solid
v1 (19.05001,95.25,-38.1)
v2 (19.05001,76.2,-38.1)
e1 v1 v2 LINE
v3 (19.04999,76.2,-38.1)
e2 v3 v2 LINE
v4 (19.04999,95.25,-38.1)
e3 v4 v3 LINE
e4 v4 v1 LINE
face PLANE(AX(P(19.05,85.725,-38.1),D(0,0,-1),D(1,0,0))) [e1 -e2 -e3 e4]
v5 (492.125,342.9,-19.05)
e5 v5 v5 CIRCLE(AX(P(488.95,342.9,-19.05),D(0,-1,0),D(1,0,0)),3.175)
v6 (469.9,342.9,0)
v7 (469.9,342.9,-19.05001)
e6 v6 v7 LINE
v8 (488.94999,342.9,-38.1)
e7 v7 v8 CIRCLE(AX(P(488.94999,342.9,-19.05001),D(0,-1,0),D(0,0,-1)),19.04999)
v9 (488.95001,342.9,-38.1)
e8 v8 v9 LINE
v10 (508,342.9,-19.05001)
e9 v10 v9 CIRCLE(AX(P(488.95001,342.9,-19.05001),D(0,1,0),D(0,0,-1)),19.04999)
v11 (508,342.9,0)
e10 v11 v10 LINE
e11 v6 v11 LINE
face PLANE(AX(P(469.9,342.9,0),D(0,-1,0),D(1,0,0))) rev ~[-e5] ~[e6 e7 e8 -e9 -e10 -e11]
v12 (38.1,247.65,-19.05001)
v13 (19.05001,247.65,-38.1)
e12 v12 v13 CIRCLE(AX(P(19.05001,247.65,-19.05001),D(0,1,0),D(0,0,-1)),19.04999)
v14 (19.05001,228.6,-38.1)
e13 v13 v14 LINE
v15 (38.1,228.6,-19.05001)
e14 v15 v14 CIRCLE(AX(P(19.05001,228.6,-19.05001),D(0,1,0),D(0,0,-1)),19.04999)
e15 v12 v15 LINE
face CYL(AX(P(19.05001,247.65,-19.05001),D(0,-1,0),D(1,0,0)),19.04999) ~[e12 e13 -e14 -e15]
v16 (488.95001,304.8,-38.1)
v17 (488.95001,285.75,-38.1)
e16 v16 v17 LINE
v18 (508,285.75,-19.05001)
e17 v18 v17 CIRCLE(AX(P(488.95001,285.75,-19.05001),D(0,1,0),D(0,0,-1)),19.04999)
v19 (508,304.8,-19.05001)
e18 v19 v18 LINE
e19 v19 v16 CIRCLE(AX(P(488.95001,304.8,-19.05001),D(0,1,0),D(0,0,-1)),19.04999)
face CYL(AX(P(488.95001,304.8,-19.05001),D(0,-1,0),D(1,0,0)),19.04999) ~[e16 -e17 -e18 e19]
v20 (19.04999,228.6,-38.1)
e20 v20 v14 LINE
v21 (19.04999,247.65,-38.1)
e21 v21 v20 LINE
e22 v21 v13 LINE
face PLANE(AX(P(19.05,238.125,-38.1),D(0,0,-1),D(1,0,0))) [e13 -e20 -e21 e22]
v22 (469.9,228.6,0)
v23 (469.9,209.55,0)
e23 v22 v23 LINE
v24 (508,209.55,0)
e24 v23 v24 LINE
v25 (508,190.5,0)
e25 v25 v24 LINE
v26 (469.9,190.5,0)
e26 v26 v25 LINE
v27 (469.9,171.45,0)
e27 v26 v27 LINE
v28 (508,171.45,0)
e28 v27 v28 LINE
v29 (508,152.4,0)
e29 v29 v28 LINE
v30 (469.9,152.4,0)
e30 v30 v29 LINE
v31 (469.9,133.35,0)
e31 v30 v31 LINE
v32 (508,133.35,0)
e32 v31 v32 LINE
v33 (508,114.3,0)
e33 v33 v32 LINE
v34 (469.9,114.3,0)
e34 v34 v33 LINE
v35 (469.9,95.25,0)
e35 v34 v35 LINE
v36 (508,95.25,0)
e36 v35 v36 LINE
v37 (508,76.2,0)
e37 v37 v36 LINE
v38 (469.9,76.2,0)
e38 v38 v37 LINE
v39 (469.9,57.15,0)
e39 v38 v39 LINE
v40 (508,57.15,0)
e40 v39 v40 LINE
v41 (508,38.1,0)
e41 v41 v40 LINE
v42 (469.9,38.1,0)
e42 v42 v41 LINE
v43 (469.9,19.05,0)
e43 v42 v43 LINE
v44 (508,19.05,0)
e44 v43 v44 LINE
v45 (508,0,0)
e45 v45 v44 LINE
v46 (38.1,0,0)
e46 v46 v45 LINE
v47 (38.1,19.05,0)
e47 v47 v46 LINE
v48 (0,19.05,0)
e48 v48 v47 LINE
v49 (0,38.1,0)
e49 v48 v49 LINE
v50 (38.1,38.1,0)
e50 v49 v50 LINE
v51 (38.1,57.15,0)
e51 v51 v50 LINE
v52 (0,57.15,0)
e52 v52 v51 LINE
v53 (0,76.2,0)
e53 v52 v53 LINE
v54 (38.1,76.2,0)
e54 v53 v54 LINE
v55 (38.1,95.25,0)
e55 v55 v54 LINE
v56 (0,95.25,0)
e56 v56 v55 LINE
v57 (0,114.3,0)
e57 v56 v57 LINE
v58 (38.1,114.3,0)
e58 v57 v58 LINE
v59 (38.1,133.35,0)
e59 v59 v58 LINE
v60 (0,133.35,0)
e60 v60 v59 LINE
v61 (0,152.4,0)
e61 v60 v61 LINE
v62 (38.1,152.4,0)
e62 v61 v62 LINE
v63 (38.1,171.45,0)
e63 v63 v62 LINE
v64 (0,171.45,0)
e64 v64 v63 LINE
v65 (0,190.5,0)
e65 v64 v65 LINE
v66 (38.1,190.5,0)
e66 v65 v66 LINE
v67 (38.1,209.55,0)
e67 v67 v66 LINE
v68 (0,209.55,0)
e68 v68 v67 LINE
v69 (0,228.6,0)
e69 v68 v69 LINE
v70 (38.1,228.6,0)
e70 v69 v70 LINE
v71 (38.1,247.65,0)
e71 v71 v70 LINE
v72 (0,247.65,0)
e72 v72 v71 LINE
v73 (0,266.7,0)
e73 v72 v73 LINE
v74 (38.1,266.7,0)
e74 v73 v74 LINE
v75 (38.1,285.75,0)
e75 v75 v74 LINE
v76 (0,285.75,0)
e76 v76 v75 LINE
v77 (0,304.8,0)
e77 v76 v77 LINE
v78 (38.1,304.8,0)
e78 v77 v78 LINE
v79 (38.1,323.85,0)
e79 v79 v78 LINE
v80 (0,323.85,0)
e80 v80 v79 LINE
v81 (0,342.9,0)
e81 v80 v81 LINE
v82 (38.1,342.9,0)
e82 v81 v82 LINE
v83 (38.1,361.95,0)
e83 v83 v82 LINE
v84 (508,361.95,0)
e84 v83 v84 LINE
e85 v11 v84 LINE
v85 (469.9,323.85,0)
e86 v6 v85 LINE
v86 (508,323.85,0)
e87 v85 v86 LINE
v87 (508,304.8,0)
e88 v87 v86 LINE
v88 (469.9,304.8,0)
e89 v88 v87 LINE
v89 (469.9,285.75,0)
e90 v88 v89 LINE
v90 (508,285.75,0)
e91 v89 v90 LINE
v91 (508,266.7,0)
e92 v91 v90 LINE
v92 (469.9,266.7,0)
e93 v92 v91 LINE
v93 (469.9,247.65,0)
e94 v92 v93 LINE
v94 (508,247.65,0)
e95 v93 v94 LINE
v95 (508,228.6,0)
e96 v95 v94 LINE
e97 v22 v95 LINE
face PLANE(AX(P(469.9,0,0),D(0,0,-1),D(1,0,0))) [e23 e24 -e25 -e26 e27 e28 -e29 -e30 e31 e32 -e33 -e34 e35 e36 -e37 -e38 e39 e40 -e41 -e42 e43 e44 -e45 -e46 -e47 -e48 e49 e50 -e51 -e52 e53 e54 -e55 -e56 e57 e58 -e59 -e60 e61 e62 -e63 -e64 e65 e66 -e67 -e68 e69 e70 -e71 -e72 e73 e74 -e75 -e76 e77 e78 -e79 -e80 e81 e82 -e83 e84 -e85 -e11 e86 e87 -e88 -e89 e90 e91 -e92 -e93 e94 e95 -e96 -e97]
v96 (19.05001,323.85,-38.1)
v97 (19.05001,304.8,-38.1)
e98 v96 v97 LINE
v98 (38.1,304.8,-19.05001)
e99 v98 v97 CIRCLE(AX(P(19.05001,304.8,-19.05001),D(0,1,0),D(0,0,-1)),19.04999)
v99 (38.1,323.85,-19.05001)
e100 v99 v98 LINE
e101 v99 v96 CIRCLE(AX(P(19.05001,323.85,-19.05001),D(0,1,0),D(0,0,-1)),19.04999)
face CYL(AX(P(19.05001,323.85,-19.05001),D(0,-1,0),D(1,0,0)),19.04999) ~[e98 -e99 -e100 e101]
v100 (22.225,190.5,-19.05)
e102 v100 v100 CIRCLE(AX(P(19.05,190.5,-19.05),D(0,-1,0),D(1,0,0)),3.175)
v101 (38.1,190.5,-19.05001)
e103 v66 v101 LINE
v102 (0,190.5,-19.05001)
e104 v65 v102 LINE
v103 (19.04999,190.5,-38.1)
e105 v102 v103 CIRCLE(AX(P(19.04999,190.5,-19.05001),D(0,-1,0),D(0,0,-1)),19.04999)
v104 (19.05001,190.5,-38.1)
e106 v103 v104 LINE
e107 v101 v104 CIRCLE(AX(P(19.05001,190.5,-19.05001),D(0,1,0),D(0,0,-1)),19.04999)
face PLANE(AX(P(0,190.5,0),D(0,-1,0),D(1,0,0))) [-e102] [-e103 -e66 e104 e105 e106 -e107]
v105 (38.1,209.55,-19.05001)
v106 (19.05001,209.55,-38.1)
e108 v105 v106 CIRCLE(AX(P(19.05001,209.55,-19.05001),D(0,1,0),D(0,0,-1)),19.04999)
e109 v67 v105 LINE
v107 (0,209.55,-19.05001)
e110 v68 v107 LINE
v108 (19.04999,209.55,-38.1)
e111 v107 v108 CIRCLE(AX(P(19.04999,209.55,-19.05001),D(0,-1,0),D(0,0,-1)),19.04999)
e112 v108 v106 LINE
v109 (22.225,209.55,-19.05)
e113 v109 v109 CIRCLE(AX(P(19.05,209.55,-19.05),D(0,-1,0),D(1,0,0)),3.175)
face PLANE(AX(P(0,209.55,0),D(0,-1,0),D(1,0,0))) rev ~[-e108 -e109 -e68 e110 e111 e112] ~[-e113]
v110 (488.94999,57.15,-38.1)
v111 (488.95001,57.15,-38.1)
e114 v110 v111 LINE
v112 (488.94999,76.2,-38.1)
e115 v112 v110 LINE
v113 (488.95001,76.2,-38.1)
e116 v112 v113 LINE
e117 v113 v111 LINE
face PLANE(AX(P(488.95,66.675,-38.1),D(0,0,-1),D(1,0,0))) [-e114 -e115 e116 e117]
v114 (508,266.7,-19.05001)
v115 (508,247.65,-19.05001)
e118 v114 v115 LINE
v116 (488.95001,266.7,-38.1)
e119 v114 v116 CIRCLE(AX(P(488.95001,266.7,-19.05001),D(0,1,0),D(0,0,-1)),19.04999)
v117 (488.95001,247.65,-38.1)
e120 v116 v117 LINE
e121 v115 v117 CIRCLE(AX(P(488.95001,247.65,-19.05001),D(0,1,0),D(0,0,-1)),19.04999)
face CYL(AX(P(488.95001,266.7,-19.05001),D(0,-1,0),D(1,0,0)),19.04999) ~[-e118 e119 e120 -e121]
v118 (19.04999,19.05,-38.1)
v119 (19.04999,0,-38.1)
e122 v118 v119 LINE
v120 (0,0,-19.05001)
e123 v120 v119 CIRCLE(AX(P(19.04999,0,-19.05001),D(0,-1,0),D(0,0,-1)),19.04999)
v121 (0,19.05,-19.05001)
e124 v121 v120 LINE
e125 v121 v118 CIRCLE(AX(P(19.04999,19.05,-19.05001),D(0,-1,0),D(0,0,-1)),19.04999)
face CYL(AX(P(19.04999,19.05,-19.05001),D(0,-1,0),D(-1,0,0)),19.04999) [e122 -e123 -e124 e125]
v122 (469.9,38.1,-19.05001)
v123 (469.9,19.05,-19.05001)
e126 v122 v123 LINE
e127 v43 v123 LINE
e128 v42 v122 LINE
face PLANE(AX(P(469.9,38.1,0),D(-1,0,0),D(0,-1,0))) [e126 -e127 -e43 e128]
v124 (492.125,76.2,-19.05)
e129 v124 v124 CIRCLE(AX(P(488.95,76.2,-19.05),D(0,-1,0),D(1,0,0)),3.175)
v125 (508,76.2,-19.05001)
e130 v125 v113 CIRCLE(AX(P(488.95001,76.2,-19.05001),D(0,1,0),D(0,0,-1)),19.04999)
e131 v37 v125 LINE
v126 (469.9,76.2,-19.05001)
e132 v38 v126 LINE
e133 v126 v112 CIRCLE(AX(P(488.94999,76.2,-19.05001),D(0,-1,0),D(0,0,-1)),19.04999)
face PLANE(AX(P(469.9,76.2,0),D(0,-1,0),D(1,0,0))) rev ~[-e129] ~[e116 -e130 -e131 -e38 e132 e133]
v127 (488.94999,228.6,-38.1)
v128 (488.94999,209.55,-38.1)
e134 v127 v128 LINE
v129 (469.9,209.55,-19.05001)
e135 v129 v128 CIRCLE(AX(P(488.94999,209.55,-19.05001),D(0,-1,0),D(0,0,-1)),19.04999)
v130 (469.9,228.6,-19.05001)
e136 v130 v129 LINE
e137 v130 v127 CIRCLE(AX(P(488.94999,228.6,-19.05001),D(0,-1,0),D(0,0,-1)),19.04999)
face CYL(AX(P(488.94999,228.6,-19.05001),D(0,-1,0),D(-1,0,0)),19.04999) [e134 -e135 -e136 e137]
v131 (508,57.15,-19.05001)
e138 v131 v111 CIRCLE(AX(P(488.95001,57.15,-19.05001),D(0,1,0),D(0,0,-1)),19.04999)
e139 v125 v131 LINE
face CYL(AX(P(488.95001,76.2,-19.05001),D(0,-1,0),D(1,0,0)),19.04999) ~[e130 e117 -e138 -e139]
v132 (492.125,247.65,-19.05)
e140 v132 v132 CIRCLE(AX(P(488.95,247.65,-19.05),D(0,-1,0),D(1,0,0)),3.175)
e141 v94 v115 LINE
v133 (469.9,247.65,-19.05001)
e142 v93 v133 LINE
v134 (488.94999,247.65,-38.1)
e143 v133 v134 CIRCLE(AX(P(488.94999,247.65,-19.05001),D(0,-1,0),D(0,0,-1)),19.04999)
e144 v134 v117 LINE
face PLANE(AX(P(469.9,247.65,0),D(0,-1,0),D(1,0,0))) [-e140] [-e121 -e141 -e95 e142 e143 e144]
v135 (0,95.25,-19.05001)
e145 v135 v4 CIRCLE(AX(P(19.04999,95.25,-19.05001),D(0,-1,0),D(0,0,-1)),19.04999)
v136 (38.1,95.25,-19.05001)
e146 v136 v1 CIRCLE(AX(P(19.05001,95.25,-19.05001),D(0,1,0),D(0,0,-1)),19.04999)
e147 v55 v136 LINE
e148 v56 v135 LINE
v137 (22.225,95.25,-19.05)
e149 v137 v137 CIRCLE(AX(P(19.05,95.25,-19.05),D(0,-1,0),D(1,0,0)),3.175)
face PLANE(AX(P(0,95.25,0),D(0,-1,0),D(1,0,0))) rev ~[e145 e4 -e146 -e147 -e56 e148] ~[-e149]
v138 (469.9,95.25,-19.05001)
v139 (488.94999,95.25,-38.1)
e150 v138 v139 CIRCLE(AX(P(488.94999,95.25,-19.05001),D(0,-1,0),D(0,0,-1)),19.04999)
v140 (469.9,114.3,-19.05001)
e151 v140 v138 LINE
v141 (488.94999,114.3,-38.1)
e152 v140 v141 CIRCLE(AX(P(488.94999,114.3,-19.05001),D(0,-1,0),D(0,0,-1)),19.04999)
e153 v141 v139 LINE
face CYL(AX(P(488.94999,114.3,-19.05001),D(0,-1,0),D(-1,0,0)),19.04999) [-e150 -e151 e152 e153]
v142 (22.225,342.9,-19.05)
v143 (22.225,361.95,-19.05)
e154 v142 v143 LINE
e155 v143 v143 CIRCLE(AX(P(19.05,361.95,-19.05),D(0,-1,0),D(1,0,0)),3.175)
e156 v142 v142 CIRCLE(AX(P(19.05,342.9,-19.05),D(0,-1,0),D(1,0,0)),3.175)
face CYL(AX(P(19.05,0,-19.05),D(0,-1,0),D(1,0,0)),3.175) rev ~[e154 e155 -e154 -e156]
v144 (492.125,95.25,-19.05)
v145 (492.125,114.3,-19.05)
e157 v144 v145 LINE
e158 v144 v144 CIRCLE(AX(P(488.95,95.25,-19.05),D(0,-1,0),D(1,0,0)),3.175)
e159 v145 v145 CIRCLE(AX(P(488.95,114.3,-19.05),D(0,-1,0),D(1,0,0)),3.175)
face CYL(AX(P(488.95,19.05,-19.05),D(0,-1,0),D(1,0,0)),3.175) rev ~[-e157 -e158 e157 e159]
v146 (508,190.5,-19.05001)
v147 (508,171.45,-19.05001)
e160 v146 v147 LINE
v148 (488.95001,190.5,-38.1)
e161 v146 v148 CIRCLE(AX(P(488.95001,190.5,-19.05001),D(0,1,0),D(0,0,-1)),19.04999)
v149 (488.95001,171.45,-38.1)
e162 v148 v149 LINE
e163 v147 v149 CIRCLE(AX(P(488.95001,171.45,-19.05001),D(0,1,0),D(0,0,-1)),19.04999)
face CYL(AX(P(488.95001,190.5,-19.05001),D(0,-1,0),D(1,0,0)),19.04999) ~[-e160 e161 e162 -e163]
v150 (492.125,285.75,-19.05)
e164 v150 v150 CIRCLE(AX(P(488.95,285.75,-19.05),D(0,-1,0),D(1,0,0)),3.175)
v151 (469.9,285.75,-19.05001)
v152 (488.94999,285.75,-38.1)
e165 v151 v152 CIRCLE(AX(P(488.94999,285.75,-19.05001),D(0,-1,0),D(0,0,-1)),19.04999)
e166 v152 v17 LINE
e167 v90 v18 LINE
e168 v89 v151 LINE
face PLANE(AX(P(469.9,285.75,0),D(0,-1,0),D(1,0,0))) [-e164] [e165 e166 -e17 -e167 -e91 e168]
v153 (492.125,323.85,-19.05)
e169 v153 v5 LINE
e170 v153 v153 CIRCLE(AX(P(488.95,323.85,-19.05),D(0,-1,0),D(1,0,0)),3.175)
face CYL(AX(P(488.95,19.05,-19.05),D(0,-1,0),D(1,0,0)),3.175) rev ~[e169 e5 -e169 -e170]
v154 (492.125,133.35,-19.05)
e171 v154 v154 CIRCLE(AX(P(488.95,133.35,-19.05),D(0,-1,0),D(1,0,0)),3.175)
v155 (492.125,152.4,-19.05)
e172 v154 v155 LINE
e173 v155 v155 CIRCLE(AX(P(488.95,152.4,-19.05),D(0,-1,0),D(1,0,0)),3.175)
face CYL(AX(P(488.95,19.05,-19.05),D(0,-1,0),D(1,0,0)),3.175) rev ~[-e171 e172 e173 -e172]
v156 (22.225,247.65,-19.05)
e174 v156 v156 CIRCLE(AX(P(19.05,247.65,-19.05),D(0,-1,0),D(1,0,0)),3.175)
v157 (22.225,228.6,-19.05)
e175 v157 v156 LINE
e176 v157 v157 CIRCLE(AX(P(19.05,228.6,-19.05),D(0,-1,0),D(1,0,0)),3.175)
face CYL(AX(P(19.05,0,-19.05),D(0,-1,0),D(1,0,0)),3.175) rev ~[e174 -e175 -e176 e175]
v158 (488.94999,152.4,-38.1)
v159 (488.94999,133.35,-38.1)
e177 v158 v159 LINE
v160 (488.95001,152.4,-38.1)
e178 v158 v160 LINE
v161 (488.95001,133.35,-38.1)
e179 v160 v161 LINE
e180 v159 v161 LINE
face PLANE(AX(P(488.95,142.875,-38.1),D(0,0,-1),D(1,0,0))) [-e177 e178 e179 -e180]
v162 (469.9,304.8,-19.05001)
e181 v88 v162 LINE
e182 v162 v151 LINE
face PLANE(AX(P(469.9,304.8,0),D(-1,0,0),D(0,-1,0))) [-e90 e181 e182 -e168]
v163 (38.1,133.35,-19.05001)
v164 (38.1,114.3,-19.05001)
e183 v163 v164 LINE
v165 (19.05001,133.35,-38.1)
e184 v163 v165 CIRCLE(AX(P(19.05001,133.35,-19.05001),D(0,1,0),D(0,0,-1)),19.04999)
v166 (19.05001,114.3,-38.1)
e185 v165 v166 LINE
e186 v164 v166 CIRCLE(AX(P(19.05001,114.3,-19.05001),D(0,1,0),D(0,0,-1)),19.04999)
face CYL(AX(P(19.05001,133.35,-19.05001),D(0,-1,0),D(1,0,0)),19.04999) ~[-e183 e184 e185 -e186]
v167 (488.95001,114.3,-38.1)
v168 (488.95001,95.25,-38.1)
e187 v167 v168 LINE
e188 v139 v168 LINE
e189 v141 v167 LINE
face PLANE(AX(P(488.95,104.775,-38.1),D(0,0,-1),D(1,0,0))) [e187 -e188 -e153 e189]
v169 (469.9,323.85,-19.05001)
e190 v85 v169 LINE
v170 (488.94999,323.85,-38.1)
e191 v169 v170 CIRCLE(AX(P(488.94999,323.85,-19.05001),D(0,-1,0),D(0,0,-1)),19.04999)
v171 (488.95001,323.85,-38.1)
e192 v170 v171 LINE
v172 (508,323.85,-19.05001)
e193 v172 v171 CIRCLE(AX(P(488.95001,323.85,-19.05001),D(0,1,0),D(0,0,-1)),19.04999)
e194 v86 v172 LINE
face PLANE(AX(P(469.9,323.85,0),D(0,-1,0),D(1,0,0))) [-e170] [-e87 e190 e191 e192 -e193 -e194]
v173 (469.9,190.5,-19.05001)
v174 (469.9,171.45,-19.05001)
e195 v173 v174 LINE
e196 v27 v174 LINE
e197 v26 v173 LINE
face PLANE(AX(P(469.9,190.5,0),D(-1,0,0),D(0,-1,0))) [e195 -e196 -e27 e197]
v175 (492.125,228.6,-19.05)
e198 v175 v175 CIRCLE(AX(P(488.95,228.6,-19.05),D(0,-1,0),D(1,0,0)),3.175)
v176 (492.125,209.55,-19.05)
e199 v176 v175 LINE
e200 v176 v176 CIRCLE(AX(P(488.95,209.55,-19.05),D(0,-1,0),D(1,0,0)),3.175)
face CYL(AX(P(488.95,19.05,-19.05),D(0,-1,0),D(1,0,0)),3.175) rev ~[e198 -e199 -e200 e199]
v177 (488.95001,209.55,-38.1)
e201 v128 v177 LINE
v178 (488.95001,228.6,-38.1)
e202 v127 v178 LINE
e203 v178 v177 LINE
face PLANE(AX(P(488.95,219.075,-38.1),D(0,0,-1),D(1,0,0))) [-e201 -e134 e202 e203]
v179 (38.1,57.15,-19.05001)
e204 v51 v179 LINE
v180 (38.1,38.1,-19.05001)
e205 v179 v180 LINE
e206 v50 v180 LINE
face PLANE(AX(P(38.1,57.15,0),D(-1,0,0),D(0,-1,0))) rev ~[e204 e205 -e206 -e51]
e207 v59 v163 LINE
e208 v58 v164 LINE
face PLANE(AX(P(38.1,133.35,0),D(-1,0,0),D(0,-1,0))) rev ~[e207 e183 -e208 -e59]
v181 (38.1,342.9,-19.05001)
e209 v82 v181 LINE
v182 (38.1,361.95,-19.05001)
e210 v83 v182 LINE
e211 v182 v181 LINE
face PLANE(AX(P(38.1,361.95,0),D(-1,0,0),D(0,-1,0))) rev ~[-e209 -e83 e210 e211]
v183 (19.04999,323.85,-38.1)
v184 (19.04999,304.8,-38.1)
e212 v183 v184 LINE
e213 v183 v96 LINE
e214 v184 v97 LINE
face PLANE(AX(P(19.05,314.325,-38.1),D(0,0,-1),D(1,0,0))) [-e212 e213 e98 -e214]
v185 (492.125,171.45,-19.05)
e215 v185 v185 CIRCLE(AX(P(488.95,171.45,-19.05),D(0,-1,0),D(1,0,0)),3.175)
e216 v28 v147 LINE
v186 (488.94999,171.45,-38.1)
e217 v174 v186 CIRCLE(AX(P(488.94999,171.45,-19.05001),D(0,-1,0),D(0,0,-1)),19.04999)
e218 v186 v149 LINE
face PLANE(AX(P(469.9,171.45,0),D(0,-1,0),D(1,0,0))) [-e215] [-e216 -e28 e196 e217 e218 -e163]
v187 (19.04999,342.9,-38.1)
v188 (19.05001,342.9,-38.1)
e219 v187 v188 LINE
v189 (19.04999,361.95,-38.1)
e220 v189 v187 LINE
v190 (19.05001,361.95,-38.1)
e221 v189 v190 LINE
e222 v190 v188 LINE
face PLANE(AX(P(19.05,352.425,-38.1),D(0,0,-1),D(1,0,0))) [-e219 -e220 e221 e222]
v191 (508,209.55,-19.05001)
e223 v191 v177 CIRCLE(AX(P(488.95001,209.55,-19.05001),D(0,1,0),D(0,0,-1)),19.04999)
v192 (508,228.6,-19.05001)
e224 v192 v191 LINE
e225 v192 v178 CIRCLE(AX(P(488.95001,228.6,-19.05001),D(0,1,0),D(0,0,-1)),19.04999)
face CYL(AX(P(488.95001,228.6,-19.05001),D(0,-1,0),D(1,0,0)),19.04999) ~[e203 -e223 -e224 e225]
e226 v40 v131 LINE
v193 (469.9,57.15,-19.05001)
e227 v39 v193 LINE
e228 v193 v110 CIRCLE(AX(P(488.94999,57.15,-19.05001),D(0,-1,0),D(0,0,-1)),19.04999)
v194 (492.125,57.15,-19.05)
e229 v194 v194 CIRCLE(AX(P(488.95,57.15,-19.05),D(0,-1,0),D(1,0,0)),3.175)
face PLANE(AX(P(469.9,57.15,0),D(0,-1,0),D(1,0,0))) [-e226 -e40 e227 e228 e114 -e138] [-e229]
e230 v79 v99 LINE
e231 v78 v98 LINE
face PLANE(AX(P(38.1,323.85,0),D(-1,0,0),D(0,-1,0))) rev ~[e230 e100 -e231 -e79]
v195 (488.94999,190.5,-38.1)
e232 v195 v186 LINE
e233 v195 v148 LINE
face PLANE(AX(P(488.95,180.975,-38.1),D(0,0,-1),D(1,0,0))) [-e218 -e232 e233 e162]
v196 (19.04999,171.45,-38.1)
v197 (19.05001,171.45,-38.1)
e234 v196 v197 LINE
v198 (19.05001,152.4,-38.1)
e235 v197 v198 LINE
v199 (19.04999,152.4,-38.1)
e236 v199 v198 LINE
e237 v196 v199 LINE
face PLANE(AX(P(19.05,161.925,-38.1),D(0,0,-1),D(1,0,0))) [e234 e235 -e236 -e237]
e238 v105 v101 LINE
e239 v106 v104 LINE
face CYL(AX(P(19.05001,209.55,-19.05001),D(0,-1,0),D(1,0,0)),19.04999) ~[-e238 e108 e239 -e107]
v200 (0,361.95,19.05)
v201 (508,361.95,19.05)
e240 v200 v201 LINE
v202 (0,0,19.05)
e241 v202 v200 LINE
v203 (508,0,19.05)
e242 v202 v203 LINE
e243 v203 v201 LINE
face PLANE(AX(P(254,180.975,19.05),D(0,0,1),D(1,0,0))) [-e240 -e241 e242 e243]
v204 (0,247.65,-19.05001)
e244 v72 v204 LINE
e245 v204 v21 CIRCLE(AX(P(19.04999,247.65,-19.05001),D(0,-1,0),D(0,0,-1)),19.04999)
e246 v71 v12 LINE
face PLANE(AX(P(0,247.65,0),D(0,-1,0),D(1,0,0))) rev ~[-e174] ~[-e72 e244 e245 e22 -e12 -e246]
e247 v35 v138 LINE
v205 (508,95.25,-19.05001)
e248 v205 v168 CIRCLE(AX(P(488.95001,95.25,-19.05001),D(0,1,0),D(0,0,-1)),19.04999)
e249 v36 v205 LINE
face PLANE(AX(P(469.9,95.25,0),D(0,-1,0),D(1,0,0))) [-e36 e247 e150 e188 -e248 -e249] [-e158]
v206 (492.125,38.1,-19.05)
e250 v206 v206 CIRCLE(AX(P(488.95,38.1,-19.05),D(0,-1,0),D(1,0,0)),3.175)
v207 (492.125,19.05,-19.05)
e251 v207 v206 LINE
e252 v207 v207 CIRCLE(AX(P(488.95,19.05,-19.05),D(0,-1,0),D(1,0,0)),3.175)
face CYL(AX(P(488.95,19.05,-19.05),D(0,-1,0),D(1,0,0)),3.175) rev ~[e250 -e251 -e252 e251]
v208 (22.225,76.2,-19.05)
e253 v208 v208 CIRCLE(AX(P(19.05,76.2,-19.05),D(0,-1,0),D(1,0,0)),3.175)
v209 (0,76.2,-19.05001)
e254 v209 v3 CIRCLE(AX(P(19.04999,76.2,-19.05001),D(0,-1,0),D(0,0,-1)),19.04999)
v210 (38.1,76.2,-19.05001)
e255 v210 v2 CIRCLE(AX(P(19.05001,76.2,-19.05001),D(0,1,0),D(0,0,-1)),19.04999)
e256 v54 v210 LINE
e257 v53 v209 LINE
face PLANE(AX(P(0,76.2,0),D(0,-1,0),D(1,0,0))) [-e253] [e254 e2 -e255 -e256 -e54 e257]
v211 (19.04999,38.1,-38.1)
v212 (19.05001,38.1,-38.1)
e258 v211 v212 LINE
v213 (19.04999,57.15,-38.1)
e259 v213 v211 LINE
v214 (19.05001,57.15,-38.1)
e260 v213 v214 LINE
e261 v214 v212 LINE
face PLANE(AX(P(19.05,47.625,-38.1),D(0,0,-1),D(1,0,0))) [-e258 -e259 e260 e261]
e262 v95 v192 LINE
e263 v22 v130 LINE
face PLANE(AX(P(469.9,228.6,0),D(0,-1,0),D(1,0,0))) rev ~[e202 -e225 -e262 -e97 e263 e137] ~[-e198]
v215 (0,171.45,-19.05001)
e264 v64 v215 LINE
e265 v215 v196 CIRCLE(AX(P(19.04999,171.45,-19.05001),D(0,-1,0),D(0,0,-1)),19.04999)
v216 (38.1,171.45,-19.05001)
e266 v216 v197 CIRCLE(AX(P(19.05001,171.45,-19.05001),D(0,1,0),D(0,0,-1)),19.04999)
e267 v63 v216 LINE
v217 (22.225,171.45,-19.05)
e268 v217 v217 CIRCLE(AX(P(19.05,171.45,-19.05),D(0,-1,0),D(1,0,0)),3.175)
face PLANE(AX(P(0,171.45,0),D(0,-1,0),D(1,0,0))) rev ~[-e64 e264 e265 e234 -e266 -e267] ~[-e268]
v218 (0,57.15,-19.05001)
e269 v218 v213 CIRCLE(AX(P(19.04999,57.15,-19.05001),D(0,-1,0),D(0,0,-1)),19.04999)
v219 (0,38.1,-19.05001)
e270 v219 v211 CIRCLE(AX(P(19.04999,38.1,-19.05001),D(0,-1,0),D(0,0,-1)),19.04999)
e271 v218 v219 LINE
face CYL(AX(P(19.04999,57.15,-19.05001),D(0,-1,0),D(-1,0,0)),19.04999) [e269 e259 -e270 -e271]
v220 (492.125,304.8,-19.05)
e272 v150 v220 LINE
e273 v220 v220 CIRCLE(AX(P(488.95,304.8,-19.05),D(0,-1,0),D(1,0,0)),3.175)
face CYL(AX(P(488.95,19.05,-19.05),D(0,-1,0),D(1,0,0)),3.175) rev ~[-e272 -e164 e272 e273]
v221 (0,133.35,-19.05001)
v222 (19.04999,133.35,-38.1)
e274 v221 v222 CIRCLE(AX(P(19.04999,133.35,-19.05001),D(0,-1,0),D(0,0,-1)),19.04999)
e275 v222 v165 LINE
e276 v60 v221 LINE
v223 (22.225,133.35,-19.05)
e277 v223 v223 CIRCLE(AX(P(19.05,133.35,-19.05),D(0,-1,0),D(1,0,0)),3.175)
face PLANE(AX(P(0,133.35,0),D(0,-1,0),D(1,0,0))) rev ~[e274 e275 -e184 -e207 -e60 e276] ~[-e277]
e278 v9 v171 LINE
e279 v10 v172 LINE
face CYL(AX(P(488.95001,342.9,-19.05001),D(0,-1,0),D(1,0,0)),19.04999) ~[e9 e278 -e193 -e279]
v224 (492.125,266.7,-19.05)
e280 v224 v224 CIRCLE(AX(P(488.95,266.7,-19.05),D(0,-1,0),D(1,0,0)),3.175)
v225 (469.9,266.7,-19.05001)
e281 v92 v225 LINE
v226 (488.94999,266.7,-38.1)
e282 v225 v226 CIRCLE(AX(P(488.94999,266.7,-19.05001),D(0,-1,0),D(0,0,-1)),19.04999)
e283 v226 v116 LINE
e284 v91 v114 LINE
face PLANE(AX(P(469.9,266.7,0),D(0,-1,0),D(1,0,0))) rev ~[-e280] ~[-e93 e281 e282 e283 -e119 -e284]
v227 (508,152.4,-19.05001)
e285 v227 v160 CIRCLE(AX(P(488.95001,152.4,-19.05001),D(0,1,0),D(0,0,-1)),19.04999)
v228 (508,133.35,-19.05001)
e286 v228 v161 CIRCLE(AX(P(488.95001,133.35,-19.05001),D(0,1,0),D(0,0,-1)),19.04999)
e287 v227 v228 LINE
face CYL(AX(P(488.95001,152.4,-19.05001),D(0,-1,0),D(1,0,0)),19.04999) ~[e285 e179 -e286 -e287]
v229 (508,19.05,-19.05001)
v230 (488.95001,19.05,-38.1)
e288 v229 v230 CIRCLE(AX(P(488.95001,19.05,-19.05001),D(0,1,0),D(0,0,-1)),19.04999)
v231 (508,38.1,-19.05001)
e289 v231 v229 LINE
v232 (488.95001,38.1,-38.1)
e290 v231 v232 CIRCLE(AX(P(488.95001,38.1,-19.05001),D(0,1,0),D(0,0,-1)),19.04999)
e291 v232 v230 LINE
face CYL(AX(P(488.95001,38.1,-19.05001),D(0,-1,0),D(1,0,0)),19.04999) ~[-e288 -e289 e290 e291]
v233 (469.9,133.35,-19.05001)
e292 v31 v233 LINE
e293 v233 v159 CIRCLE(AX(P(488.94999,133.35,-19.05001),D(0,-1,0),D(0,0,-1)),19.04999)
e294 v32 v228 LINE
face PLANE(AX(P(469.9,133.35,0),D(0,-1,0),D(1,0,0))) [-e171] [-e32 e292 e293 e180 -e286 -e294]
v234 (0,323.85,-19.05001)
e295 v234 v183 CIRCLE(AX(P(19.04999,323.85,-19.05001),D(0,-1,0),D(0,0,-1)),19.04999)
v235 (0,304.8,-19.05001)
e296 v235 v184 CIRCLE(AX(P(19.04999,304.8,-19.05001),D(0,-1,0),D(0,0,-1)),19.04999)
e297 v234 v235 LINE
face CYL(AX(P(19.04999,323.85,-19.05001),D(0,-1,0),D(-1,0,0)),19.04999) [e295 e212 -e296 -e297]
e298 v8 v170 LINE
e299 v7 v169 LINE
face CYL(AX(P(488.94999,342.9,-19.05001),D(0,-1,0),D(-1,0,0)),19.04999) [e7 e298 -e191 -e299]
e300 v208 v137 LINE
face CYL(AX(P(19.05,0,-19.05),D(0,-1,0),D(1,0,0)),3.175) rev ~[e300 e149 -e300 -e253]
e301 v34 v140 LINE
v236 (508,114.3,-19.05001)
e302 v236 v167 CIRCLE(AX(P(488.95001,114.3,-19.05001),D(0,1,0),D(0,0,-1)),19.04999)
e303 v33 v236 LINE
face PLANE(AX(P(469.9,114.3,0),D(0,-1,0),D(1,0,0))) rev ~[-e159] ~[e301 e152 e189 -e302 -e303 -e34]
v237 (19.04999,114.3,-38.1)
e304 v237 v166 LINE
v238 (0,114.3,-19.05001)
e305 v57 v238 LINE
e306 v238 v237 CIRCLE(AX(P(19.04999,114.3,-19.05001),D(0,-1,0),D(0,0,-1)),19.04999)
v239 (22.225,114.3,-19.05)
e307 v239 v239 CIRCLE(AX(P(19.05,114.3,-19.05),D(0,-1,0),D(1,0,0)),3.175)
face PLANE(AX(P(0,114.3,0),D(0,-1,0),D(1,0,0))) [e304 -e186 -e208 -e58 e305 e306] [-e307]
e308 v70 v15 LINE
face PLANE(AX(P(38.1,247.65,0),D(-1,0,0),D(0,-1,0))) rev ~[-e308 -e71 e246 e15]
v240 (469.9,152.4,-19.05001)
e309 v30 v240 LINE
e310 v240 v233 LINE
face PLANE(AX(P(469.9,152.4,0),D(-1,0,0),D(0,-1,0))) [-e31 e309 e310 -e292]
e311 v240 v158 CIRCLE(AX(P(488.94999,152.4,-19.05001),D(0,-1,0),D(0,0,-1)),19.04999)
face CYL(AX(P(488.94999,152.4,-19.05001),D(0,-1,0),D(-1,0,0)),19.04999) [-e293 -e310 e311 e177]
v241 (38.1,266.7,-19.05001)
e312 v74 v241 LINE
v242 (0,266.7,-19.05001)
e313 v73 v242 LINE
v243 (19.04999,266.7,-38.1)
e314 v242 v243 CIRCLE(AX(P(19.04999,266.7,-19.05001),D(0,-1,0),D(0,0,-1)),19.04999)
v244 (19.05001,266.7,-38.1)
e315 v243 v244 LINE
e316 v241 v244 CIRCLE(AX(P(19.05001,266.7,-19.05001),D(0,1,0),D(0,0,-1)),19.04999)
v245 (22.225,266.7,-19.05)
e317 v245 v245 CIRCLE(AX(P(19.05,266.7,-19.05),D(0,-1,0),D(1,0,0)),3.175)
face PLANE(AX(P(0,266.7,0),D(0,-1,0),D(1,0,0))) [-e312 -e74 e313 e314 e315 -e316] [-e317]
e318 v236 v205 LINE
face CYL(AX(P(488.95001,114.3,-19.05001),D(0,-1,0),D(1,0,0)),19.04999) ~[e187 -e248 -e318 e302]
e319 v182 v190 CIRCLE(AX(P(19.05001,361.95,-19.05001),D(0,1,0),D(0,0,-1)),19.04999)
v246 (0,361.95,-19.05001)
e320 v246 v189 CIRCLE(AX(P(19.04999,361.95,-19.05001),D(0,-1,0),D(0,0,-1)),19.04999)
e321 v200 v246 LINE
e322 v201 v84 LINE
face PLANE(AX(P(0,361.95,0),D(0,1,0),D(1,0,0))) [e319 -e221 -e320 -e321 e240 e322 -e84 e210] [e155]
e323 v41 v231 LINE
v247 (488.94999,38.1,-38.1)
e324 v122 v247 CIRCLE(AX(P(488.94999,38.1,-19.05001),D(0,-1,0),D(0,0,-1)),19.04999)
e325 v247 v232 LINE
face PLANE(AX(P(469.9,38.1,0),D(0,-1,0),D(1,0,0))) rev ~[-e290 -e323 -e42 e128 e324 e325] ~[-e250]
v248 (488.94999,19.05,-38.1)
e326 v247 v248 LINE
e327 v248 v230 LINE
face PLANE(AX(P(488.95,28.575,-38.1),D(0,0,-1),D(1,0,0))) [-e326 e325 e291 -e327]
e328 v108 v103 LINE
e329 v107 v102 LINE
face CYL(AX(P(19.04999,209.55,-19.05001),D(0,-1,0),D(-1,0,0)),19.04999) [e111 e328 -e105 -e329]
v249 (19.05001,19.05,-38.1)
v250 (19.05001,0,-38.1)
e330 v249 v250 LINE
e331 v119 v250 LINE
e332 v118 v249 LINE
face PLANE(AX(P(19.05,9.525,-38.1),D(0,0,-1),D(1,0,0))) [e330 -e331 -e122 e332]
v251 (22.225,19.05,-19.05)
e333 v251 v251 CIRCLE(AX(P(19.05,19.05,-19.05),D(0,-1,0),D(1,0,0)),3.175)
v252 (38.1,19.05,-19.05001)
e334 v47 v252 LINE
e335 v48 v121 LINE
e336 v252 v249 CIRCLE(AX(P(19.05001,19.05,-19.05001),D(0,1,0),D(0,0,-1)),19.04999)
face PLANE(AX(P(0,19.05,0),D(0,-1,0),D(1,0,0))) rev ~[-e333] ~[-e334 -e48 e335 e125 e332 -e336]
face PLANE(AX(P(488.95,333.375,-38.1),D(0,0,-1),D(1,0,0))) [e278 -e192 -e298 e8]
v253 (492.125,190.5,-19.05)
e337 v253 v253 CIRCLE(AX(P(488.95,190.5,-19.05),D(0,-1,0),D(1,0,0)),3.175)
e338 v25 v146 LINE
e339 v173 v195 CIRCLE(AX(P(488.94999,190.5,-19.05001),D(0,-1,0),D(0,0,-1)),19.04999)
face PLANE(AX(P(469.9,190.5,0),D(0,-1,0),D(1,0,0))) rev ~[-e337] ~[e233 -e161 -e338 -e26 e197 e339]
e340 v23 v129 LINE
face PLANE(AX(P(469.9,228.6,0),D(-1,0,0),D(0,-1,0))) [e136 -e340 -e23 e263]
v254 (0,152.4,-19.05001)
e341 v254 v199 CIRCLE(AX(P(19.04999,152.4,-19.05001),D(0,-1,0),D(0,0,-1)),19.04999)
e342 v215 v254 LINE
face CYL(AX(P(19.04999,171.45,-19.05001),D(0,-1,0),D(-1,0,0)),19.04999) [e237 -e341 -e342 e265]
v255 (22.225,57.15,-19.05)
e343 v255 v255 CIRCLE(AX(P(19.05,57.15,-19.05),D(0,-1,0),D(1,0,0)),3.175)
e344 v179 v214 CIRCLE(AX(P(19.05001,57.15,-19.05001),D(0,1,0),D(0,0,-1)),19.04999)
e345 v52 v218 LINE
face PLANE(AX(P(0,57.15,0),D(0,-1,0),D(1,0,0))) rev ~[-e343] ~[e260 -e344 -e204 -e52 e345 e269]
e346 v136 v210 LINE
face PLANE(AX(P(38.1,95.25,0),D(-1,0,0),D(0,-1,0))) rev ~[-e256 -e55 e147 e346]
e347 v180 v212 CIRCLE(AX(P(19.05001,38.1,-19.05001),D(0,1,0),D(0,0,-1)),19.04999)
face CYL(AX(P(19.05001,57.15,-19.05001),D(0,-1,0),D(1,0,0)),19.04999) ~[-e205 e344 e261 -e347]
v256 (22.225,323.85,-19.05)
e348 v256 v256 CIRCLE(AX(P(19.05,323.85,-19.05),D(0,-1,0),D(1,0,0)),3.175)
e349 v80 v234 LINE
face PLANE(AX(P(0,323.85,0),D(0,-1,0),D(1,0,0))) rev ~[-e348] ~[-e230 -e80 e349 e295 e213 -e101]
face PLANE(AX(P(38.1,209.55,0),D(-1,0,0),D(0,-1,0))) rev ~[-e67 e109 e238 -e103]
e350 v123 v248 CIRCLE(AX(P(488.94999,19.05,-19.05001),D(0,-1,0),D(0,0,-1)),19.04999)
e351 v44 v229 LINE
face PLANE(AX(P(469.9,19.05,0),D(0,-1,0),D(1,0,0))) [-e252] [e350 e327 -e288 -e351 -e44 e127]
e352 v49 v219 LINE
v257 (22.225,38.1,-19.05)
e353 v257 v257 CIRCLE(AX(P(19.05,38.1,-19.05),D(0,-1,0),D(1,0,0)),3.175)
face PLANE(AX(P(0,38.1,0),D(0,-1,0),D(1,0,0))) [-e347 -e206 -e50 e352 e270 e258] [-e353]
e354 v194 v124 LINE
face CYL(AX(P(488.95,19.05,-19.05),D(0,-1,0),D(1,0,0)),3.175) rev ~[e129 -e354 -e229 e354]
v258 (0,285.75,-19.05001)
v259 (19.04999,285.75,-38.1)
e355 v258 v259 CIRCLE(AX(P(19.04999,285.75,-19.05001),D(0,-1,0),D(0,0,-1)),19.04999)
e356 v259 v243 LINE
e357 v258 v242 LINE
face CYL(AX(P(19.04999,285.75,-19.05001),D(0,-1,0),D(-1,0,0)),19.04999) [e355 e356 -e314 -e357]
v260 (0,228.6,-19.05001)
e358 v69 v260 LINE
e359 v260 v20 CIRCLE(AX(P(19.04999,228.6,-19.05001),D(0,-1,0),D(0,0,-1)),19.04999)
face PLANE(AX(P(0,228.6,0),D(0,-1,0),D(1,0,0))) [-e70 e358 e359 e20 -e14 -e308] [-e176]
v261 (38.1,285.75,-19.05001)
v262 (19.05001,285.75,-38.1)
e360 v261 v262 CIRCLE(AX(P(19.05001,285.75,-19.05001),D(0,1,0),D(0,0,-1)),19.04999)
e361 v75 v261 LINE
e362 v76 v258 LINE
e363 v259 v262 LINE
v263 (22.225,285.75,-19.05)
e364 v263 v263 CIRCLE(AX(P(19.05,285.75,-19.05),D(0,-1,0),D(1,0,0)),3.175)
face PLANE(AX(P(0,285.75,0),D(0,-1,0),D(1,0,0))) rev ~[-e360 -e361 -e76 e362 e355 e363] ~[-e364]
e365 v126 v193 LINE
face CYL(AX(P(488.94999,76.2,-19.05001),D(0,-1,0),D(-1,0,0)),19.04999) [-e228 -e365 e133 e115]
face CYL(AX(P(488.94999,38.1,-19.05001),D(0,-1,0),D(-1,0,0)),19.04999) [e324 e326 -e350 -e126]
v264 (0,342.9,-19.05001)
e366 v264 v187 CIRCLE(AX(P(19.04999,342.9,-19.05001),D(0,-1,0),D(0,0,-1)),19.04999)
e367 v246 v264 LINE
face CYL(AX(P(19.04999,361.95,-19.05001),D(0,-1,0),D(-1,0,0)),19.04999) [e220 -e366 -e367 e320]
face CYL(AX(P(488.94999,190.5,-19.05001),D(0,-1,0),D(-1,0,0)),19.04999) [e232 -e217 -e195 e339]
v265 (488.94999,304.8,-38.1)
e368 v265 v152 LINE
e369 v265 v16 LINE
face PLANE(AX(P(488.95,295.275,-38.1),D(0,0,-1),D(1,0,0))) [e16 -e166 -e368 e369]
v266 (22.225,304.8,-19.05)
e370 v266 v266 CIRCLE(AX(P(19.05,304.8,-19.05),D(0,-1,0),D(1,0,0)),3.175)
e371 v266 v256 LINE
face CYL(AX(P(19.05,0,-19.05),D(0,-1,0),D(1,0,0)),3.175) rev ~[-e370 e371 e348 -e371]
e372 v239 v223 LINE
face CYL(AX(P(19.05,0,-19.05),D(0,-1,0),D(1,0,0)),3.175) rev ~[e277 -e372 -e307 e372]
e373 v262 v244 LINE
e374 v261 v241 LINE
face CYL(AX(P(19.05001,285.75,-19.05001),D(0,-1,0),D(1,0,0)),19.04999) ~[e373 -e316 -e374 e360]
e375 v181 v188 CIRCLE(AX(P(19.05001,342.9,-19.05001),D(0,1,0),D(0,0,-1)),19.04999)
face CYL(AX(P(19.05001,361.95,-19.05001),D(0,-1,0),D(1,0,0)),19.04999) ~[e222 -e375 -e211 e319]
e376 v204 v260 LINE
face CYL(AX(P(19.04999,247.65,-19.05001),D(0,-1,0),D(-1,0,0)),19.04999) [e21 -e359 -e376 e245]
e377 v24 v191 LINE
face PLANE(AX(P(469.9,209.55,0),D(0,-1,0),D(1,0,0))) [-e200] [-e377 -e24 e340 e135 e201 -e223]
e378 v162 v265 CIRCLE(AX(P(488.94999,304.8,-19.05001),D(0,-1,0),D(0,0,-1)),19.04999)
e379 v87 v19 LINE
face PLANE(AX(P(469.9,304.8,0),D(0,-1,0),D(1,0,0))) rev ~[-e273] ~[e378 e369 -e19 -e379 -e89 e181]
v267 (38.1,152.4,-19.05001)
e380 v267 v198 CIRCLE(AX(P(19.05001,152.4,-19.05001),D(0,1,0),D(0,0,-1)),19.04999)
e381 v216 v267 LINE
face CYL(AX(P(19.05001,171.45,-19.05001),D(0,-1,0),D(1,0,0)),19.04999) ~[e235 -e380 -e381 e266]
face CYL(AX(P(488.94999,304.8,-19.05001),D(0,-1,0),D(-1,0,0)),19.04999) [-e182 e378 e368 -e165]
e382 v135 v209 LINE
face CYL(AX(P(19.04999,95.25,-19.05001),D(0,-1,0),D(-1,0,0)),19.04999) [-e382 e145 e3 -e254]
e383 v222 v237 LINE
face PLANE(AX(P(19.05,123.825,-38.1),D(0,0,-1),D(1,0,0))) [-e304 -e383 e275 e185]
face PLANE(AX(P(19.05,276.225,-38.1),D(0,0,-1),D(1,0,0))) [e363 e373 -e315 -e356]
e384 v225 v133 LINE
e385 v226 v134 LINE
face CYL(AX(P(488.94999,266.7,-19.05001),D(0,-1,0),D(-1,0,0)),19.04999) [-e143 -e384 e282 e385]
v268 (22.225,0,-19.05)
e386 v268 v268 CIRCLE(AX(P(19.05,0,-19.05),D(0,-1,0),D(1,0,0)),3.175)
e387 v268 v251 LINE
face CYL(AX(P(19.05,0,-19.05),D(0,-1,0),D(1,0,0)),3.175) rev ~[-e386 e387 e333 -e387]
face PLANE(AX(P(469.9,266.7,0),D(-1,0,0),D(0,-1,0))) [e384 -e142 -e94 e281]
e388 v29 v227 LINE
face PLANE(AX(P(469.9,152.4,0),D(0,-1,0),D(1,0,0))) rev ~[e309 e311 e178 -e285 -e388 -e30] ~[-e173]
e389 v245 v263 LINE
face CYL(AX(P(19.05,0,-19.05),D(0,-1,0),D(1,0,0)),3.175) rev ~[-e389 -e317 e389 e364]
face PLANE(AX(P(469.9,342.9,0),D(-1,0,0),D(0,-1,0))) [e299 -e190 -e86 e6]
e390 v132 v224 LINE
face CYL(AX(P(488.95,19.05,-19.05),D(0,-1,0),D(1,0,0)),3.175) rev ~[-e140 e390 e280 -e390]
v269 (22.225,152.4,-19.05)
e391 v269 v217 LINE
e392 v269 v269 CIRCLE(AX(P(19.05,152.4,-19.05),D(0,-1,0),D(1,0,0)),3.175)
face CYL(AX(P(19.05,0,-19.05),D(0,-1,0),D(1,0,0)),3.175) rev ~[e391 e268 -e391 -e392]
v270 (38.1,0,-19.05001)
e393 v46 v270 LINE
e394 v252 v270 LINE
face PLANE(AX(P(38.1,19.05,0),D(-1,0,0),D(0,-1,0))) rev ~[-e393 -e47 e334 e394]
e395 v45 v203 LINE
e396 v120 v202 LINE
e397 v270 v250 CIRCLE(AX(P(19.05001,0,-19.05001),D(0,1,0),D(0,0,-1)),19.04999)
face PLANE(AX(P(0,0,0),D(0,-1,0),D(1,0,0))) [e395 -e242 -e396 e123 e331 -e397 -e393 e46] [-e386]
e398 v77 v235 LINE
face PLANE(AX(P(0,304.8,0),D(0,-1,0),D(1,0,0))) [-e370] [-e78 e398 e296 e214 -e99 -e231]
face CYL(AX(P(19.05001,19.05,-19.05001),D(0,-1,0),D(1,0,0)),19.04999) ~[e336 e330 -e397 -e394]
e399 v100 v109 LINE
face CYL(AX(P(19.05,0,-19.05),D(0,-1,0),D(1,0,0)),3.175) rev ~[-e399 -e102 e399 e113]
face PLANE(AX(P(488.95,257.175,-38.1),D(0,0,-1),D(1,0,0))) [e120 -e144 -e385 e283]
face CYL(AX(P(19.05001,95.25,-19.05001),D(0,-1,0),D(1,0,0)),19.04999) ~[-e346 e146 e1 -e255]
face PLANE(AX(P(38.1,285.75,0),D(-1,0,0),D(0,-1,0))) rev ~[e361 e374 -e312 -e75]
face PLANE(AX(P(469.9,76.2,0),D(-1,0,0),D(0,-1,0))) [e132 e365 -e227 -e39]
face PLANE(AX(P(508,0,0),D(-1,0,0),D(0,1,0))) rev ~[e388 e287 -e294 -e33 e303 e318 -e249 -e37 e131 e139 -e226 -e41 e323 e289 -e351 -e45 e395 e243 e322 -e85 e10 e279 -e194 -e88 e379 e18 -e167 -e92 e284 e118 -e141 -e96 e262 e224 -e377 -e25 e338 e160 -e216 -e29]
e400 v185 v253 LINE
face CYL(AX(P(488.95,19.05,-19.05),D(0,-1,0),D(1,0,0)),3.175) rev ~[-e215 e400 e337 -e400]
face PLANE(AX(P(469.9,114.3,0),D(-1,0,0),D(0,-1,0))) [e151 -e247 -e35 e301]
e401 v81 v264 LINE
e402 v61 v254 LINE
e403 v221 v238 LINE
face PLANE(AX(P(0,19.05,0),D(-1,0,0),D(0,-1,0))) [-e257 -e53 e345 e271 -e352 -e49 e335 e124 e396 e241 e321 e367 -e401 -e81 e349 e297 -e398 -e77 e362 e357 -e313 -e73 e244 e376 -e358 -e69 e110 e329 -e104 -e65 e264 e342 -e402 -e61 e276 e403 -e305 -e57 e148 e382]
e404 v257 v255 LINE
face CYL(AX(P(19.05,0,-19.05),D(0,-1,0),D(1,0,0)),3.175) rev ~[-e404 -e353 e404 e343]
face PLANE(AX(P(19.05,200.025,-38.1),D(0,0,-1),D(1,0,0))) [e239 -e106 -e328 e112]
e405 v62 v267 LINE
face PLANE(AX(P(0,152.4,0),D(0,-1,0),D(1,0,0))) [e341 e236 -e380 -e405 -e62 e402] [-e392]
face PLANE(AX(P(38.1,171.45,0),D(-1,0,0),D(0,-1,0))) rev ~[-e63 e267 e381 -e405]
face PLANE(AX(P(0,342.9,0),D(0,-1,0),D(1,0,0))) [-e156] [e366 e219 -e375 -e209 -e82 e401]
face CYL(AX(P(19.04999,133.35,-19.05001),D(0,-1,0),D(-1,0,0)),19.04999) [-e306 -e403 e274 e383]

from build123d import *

# Parameters (mm, degrees)
F0_W      = 508
F0_H      = 361.95
F1_DEPTH  = 19.05
F2_W      = 38.1
F2_H      = 19.05
F3_DEPTH  = 38.1
F4_R      = 19.04999
F5_R      = 19.04999
F6_R      = 3.175
F7_DEPTH  = 361.951
F8_W      = 38.1
F8_H      = 38.1
F9_DEPTH  = 361.951
F10_W     = 38.1
F10_H     = 19.05
F11_DEPTH = 38.1
F12_R     = 19.04999
F13_R     = 3.175
F14_DEPTH = 342.901


# Not quite as in the source:
# - a fillet or chamfer is up to 0.001 mm smaller than in the source, because OpenCascade refuses the exact size


with BuildPart() as f1:
    # F0 (on Top) → F1 (new body)
    with BuildSketch(Plane.XY):
        with Locations((254, 180.975)):
            Rectangle(F0_W, F0_H)
    extrude(amount=F1_DEPTH)

    # F2 (on face) → F3 (join)
    with BuildSketch(Plane(origin=(0, 0, 0), x_dir=(1, 0, 0), z_dir=(0, 0, -1))):
        with Locations((19.05, -9.525)):
            Rectangle(F2_W, F2_H)
        with Locations((19.05, -47.625)):
            Rectangle(F2_W, F2_H)
        with Locations((19.05, -85.725)):
            Rectangle(F2_W, F2_H)
        with Locations((19.05, -123.825)):
            Rectangle(F2_W, F2_H)
        with Locations((19.05, -161.925)):
            Rectangle(F2_W, F2_H)
        with Locations((19.05, -200.025)):
            Rectangle(F2_W, F2_H)
        with Locations((19.05, -238.125)):
            Rectangle(F2_W, F2_H)
        with Locations((19.05, -276.225)):
            Rectangle(F2_W, F2_H)
        with Locations((19.05, -314.325)):
            Rectangle(F2_W, F2_H)
        with Locations((19.05, -352.425)):
            Rectangle(F2_W, F2_H)
        with Locations((488.95, -9.525)):
            Rectangle(F2_W, F2_H)
        with Locations((488.95, -47.625)):
            Rectangle(F2_W, F2_H)
        with Locations((488.95, -85.725)):
            Rectangle(F2_W, F2_H)
        with Locations((488.95, -123.825)):
            Rectangle(F2_W, F2_H)
        with Locations((488.95, -161.925)):
            Rectangle(F2_W, F2_H)
        with Locations((488.95, -200.025)):
            Rectangle(F2_W, F2_H)
        with Locations((488.95, -238.125)):
            Rectangle(F2_W, F2_H)
        with Locations((488.95, -276.225)):
            Rectangle(F2_W, F2_H)
        with Locations((488.95, -314.325)):
            Rectangle(F2_W, F2_H)
        with Locations((488.95, -352.425)):
            Rectangle(F2_W, F2_H)
    extrude(amount=F3_DEPTH)

    # F4 (radius 19.05 in the source; OpenCascade refuses exactly that, so slightly less here)
    f4_edges = [f1.edges().sort_by_distance(p)[0] for p in [
        (508, 9.525, -38.1),
        (469.9, 9.525, -38.1),
        (469.9, 47.625, -38.1),
        (508, 47.625, -38.1),
        (508, 85.725, -38.1),
        (469.9, 85.725, -38.1),
        (469.9, 123.825, -38.1),
        (508, 123.825, -38.1),
        (508, 161.925, -38.1),
        (469.9, 161.925, -38.1),
        (508, 200.025, -38.1),
        (469.9, 200.025, -38.1),
        (469.9, 238.125, -38.1),
        (508, 238.125, -38.1),
        (469.9, 276.225, -38.1),
        (508, 276.225, -38.1),
        (469.9, 314.325, -38.1),
        (508, 314.325, -38.1),
        (469.9, 352.425, -38.1),
        (508, 352.425, -38.1),
    ]]
    fillet(f4_edges, radius=F4_R)

    # F5 (radius 19.05 in the source; OpenCascade refuses exactly that, so slightly less here)
    f5_edges = [f1.edges().sort_by_distance(p)[0] for p in [
        (38.1, 9.525, -38.1),
        (0, 9.525, -38.1),
        (38.1, 47.625, -38.1),
        (0, 47.625, -38.1),
        (38.1, 85.725, -38.1),
        (0, 85.725, -38.1),
        (38.1, 123.825, -38.1),
        (0, 123.825, -38.1),
        (0, 161.925, -38.1),
        (38.1, 161.925, -38.1),
        (38.1, 200.025, -38.1),
        (0, 200.025, -38.1),
        (0, 238.125, -38.1),
        (38.1, 238.125, -38.1),
        (38.1, 276.225, -38.1),
        (0, 276.225, -38.1),
        (38.1, 314.325, -38.1),
        (0, 314.325, -38.1),
        (38.1, 352.425, -38.1),
        (0, 352.425, -38.1),
    ]]
    fillet(f5_edges, radius=F5_R)

    # F6 (on face) → F7 (cut, through all)
    with BuildSketch(Plane.XZ):
        with Locations((19.05, -19.05)):
            Circle(F6_R)
        with Locations((488.95, -19.05)):
            Circle(F6_R)
    extrude(amount=-F7_DEPTH, mode=Mode.SUBTRACT)

    # F8 (on face) → F9 (cut, through all)
    with BuildSketch(Plane.XZ):
        with Locations((488.95, -19.05)):
            Rectangle(F8_W, F8_H)
    extrude(amount=-F9_DEPTH, mode=Mode.SUBTRACT)

    # F10 (on face) → F11 (join)
    with BuildSketch(Plane(origin=(0, 0, 0), x_dir=(1, 0, 0), z_dir=(0, 0, -1))):
        with Locations((488.95, -28.575)):
            Rectangle(F10_W, F10_H)
        with Locations((488.95, -66.675)):
            Rectangle(F10_W, F10_H)
        with Locations((488.95, -104.775)):
            Rectangle(F10_W, F10_H)
        with Locations((488.95, -142.875)):
            Rectangle(F10_W, F10_H)
        with Locations((488.95, -180.975)):
            Rectangle(F10_W, F10_H)
        with Locations((488.95, -219.075)):
            Rectangle(F10_W, F10_H)
        with Locations((488.95, -257.175)):
            Rectangle(F10_W, F10_H)
        with Locations((488.95, -295.275)):
            Rectangle(F10_W, F10_H)
        with Locations((488.95, -333.375)):
            Rectangle(F10_W, F10_H)
    extrude(amount=F11_DEPTH)

    # F12 (radius 19.05 in the source; OpenCascade refuses exactly that, so slightly less here)
    f12_edges = [f1.edges().sort_by_distance(p)[0] for p in [
        (469.9, 28.575, -38.1),
        (508, 28.575, -38.1),
        (508, 66.675, -38.1),
        (508, 104.775, -38.1),
        (508, 142.875, -38.1),
        (508, 180.975, -38.1),
        (469.9, 66.675, -38.1),
        (469.9, 104.775, -38.1),
        (469.9, 142.875, -38.1),
        (469.9, 180.975, -38.1),
        (469.9, 219.075, -38.1),
        (469.9, 257.175, -38.1),
        (469.9, 295.275, -38.1),
        (469.9, 333.375, -38.1),
        (508, 333.375, -38.1),
        (508, 295.275, -38.1),
        (508, 219.075, -38.1),
        (508, 257.175, -38.1),
    ]]
    fillet(f12_edges, radius=F12_R)

    # F13 (on face) → F14 (cut, through all)
    with BuildSketch(Plane.XZ.offset(-19.05)):
        with Locations((488.95, -19.05)):
            Circle(F13_R)
    extrude(amount=-F14_DEPTH, mode=Mode.SUBTRACT)


solid = f1.part
